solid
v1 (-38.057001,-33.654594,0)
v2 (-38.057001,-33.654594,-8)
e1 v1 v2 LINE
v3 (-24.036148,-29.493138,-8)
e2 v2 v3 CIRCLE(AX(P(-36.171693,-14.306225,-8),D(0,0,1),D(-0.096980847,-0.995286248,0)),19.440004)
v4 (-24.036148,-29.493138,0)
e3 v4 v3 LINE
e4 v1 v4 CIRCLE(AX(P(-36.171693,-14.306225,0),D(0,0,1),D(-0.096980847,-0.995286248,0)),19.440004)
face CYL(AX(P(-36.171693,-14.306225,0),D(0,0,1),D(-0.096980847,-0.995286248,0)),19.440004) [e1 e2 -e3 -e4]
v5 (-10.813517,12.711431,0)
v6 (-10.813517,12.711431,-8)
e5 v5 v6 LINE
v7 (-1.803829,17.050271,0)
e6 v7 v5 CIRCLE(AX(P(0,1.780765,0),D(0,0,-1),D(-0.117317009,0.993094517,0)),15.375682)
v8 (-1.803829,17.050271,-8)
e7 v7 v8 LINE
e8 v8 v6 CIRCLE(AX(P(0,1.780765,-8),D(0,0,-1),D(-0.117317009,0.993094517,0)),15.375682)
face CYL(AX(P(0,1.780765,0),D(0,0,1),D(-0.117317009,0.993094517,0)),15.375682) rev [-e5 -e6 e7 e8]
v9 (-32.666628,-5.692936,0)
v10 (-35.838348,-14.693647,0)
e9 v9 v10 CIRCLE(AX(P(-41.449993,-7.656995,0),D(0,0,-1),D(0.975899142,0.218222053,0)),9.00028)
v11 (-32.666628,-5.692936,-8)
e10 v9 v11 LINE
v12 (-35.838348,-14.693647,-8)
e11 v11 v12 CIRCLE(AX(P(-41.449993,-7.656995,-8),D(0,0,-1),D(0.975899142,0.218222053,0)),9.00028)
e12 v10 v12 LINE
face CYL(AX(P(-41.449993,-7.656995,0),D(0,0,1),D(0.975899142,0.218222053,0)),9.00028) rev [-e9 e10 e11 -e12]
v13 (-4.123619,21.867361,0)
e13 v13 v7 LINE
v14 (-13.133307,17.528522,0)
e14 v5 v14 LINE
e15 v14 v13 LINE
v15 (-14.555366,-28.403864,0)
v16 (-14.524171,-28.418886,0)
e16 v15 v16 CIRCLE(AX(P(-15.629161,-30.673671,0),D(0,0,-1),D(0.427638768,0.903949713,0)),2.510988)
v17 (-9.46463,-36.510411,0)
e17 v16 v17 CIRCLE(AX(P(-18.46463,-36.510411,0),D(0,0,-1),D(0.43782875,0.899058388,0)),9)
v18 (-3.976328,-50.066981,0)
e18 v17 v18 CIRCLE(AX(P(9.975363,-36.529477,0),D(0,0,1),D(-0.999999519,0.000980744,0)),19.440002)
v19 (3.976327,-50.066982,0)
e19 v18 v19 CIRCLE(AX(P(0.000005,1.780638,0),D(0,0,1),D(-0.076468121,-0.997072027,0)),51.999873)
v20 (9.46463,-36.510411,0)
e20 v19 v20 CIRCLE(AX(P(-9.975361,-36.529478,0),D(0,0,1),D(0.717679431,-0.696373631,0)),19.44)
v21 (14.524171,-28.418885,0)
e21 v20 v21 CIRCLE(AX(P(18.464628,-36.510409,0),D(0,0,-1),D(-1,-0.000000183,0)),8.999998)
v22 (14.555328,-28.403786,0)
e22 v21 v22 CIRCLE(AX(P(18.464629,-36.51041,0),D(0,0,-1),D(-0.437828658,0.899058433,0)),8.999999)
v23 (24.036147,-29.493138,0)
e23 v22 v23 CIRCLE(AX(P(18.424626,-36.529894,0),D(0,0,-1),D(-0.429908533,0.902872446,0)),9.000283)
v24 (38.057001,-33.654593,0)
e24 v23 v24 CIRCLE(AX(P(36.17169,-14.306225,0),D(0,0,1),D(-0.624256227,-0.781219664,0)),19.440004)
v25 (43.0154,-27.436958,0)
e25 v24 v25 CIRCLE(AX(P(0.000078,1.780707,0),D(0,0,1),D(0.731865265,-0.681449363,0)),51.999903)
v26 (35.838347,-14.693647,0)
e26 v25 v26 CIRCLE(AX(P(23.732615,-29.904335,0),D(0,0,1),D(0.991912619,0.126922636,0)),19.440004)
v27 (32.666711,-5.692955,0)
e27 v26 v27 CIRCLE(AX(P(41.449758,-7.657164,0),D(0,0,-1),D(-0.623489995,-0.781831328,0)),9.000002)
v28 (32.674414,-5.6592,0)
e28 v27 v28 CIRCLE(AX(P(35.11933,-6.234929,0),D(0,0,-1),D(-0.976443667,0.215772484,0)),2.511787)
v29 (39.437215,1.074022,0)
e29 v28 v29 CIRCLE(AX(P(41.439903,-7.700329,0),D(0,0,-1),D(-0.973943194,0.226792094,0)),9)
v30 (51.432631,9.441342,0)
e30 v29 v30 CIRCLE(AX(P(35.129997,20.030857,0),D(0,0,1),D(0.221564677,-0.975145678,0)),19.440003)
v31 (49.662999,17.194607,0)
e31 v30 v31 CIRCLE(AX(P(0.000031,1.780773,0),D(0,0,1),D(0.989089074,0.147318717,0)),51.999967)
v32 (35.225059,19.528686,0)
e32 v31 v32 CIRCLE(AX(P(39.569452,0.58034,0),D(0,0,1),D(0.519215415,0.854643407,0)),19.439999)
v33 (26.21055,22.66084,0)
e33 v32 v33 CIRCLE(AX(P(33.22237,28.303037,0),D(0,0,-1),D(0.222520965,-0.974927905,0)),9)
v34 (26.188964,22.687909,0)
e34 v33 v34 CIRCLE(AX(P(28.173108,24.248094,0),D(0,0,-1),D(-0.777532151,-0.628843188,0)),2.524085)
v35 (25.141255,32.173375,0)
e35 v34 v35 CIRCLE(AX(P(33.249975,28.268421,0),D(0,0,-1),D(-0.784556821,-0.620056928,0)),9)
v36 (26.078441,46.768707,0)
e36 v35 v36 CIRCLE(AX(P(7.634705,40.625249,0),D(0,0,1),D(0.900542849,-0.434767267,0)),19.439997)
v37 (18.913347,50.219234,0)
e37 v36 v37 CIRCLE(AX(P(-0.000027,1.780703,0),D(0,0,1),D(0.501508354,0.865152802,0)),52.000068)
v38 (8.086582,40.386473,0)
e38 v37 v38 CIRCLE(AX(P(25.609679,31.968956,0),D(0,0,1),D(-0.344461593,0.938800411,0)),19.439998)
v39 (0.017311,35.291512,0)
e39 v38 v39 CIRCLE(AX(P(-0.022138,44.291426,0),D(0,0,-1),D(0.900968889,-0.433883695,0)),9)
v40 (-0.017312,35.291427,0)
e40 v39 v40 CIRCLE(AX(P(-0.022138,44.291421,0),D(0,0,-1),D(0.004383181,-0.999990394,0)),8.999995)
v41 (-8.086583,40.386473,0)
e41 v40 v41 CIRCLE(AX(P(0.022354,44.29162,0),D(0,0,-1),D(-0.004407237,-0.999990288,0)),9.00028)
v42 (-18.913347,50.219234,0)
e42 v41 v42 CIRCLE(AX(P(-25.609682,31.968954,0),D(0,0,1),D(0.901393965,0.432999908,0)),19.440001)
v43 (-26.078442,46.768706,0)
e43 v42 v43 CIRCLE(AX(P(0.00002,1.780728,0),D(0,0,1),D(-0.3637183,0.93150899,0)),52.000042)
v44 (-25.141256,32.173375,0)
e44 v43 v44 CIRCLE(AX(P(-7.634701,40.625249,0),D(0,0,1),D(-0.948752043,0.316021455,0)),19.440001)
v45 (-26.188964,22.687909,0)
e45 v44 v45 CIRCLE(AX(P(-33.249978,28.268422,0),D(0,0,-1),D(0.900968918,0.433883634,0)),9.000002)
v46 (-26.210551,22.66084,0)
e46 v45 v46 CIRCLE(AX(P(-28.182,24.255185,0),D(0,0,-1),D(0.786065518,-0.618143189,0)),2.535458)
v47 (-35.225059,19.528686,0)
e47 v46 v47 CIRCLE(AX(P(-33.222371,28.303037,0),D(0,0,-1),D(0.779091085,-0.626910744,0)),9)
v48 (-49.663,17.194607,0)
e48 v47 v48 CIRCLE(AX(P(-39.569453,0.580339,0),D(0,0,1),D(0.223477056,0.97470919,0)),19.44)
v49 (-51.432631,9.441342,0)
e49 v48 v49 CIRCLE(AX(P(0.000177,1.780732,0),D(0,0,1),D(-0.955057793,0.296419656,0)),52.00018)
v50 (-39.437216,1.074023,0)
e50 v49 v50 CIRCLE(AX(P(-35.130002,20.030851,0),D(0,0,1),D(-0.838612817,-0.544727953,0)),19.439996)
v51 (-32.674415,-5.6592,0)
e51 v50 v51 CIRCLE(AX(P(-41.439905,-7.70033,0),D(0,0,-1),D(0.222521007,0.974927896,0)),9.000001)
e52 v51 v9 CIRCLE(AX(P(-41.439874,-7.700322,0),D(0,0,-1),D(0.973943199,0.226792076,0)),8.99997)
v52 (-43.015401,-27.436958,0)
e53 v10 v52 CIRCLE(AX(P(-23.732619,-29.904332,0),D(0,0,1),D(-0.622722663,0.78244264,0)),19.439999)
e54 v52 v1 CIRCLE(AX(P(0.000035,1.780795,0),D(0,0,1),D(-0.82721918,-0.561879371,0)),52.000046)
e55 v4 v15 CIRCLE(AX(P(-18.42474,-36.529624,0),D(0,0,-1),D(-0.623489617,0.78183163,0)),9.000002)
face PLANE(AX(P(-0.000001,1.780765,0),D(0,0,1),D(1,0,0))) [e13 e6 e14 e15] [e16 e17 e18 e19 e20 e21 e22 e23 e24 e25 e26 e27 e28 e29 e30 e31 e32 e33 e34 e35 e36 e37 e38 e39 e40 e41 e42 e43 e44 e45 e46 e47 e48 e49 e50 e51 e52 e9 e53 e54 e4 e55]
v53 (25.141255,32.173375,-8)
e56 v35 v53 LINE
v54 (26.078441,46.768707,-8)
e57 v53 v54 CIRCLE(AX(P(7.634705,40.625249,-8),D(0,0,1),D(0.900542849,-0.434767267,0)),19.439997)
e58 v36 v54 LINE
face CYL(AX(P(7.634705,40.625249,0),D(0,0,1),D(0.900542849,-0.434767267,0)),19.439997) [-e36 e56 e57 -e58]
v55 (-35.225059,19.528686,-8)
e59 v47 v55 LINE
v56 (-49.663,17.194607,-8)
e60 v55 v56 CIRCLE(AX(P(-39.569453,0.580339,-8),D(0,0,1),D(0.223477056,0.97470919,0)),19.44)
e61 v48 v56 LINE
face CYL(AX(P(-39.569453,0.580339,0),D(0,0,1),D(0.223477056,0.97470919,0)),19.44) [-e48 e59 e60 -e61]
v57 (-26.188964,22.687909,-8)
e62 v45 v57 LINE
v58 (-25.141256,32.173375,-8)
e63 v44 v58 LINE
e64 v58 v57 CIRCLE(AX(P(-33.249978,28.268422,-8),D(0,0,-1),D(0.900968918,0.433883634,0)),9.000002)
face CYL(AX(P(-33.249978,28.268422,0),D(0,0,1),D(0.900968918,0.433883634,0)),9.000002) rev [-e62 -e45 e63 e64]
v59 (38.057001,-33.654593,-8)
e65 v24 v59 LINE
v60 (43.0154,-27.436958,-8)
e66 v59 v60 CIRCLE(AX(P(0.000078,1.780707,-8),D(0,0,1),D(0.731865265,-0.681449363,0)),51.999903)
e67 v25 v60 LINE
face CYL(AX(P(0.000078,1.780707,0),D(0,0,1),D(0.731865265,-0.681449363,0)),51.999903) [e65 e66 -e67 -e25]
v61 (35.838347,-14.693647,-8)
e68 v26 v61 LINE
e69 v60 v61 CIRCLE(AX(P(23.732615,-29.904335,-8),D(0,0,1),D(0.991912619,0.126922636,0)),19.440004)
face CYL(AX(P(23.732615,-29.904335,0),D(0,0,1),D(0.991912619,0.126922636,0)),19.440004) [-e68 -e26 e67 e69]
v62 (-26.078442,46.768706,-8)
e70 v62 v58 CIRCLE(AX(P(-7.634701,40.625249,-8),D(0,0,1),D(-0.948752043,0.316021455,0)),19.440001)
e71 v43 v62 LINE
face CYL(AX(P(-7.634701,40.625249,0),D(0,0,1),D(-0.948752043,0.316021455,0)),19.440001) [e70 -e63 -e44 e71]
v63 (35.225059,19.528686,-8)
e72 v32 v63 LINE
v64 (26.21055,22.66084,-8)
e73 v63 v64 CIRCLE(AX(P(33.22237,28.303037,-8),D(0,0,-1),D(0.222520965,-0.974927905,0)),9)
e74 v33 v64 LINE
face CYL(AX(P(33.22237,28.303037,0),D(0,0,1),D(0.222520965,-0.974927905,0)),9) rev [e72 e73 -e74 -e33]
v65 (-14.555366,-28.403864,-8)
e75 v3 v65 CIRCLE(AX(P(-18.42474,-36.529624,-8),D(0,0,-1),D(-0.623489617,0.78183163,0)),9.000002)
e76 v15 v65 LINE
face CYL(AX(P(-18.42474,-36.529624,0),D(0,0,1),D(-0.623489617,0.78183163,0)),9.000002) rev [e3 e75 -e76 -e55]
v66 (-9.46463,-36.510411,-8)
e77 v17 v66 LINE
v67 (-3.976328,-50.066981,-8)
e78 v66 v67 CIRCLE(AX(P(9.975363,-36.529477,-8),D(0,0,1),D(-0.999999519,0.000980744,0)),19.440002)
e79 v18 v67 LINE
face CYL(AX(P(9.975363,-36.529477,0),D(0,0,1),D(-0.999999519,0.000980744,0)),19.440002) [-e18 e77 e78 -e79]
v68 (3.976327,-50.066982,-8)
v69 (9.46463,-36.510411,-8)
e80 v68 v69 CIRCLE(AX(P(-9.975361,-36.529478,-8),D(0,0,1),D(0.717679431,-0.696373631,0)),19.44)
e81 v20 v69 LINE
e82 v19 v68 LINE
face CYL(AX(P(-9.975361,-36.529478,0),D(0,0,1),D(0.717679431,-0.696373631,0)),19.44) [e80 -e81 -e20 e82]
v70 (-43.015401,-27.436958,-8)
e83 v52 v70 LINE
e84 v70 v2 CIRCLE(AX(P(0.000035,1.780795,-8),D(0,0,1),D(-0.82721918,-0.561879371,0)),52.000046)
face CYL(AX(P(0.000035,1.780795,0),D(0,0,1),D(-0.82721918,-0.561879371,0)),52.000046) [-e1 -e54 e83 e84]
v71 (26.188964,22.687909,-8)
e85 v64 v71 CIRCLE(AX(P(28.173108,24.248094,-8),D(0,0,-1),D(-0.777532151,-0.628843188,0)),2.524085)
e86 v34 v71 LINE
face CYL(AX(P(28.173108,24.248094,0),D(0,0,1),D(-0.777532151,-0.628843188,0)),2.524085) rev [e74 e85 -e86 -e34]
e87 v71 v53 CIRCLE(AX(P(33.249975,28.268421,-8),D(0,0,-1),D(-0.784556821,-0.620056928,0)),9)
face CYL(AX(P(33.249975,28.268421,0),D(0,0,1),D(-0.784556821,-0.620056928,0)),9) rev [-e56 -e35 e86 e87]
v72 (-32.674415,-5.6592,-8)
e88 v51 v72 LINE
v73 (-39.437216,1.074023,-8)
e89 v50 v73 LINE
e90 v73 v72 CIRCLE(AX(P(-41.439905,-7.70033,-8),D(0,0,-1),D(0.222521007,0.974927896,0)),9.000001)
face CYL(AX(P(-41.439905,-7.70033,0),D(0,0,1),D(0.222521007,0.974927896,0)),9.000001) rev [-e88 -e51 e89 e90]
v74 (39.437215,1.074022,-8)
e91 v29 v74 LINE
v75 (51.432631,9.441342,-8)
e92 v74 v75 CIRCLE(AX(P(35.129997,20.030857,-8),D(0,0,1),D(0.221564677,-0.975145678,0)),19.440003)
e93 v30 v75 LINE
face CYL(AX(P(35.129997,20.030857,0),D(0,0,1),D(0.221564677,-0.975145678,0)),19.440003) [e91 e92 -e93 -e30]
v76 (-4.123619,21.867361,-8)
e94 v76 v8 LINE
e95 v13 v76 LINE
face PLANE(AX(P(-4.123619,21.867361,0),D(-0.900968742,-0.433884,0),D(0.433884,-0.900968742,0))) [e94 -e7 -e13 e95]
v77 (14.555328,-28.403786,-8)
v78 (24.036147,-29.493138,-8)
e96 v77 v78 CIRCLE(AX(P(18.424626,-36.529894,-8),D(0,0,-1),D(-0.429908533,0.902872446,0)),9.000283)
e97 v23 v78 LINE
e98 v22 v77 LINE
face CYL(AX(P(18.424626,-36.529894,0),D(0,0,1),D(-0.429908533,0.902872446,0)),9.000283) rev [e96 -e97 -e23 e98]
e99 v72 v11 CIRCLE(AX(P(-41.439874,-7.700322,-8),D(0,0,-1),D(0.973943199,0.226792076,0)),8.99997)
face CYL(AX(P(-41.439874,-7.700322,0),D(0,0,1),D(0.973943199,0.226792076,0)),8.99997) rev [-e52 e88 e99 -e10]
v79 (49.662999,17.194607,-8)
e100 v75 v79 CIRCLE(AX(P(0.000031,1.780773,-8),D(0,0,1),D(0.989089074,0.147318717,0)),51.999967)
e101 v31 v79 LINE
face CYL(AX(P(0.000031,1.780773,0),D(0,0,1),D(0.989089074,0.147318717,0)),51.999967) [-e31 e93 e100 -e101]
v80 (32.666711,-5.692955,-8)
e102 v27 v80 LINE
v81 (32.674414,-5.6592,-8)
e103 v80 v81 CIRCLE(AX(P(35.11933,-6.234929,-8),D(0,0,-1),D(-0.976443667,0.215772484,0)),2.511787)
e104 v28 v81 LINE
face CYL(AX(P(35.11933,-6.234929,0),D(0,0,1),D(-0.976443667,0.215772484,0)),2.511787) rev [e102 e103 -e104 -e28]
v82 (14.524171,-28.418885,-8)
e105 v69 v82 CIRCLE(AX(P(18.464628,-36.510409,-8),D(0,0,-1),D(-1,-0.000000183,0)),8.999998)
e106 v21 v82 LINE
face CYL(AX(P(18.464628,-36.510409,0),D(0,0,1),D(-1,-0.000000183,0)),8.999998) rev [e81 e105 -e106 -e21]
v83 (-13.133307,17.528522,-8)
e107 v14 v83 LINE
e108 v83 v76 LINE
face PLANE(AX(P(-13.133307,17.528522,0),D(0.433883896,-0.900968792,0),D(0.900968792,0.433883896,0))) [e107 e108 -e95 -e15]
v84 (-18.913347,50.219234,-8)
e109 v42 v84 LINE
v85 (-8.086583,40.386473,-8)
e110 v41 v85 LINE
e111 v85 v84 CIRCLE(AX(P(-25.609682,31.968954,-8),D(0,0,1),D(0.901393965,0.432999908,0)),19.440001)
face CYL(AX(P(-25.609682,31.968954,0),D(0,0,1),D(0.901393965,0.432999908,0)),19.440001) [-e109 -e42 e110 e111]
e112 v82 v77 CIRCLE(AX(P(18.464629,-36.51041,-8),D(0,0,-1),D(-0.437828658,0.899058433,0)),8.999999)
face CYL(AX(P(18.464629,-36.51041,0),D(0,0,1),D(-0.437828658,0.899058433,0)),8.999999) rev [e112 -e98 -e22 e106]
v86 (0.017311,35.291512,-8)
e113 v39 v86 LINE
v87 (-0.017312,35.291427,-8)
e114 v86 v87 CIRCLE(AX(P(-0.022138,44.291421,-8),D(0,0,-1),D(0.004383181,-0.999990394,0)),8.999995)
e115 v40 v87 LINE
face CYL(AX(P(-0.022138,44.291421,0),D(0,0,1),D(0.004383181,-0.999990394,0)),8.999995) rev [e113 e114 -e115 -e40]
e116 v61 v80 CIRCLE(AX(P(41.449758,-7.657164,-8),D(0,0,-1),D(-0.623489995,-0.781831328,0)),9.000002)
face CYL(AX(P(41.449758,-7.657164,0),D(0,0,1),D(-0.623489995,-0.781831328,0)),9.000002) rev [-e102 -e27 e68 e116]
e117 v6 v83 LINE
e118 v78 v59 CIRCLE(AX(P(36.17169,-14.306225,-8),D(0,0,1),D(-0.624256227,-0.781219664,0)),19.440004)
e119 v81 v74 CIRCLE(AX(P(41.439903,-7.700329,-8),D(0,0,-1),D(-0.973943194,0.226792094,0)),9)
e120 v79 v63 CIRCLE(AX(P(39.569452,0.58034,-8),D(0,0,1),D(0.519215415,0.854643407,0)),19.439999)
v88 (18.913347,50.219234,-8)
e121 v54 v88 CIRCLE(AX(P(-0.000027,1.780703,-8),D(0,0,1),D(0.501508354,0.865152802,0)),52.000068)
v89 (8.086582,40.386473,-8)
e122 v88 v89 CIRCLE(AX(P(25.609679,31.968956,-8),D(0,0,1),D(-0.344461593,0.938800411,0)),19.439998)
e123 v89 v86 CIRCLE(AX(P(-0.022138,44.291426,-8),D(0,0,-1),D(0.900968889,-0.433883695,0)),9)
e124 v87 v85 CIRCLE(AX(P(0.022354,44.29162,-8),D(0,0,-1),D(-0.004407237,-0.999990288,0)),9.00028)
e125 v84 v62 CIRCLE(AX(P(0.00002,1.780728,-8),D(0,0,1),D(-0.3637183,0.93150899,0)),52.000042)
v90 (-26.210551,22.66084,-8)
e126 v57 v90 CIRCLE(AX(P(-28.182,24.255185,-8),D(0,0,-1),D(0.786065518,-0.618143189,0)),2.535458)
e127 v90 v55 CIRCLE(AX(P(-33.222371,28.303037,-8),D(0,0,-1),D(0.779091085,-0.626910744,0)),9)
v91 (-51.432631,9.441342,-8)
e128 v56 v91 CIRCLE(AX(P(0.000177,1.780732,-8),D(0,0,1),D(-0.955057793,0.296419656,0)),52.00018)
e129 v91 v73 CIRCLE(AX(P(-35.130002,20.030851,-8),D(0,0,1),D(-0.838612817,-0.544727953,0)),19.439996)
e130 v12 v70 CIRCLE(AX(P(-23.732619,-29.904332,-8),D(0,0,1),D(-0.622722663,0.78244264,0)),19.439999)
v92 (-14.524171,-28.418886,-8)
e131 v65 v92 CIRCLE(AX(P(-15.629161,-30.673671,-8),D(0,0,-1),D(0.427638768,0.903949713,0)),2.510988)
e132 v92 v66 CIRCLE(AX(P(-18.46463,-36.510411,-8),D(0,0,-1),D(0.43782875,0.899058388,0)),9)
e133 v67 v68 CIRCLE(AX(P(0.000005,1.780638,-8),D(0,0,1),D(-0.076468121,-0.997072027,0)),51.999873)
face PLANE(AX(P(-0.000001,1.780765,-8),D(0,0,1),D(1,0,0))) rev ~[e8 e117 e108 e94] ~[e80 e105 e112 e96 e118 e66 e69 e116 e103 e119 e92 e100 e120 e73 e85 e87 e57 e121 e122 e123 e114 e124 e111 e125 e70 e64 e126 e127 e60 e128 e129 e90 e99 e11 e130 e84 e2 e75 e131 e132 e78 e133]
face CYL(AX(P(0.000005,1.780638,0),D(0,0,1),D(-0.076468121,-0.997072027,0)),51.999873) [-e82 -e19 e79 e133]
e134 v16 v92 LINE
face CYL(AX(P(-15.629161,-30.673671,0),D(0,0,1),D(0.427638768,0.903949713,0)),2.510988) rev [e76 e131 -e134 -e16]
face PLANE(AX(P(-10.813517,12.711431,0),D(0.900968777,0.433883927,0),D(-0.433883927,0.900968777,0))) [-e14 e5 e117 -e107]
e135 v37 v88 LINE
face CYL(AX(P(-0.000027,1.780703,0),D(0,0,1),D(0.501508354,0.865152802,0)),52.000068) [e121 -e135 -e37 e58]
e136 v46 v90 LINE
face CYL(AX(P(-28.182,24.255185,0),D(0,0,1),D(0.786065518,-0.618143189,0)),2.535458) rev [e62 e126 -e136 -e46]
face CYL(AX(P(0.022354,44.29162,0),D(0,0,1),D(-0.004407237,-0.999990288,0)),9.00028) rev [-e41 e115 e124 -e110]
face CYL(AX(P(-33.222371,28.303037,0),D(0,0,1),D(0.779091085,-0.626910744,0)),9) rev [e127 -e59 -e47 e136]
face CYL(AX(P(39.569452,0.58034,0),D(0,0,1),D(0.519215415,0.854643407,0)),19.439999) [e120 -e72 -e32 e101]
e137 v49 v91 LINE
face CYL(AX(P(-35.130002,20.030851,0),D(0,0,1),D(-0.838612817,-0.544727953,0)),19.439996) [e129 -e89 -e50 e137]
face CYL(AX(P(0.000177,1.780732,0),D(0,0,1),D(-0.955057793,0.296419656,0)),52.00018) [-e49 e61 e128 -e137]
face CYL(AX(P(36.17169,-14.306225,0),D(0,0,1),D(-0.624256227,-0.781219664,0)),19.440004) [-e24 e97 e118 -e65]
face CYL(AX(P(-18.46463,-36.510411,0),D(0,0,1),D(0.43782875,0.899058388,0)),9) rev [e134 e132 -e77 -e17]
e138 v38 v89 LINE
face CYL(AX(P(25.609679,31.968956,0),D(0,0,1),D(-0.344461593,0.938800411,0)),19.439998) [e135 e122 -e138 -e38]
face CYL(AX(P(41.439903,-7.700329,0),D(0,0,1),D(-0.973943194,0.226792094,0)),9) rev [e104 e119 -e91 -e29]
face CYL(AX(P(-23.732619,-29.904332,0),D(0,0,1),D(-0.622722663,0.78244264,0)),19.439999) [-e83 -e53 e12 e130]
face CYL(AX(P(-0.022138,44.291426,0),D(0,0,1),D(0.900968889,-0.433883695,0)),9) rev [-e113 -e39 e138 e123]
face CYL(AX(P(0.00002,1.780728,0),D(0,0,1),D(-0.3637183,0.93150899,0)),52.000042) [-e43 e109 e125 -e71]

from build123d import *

# Parameters (mm, degrees)
F1_DEPTH = 8


# Not quite as in the source:
# - ends of sketch curves that miss each other by under 0.0002 mm in the source are joined


with BuildPart() as f1:
    # F0 (on Top) → F1 (new body)
    with BuildSketch(Plane.XY):
        with BuildLine():
            ThreePointArc((0.0173106263, 35.2915124556), (-6.457e-07, 35.2914532257), (-0.0173119996, 35.2914272939))
            ThreePointArc((-0.0173119996, 35.2914272939), (-4.7828415657, 36.6814206792), (-8.0865831016, 40.3864729511))
            ThreePointArc((-8.0865831016, 40.3864729511), (-12.5400209066, 46.3598395768), (-18.9133471994, 50.2192344565))
            ThreePointArc((-18.9133471994, 50.2192344565), (-22.5619545404, 48.6311460797), (-26.0784416984, 46.7687064797))
            ThreePointArc((-26.0784416984, 46.7687064797), (-27.0347490245, 39.379546207), (-25.1412558363, 32.173375079))
            ThreePointArc((-25.1412558363, 32.173375079), (-24.3043791298, 27.2803437578), (-26.1889642235, 22.6879091335))
            ThreePointArc((-26.1889642235, 22.6879091335), (-26.1997114341, 22.6743379832), (-26.2105512359, 22.6608403006))
            ThreePointArc((-26.2105512359, 22.6608403006), (-30.268483933, 19.8015929347), (-35.2250588486, 19.5286856632))
            ThreePointArc((-35.2250588486, 19.5286856632), (-42.6718988891, 19.7711813344), (-49.6630001039, 17.1946071711))
            ThreePointArc((-49.6630001039, 17.1946071711), (-50.6962513252, 13.3518540399), (-51.4326312922, 9.4413418946))
            ThreePointArc((-51.4326312922, 9.4413418946), (-46.2518013791, 4.086604184), (-39.4372158458, 1.0740226787))
            ThreePointArc((-39.4372158458, 1.0740226787), (-35.0899055663, -1.3224359394), (-32.6744151986, -5.6592003729))
            ThreePointArc((-32.6744151986, -5.6592003729), (-32.6705053342, -5.676064432), (-32.6666279149, -5.6929359805))
            ThreePointArc((-32.6666279149, -5.6929359805), (-32.9613409881, -10.648285961), (-35.8383477489, -14.6936473148))
            ThreePointArc((-35.8383477489, -14.6936473148), (-40.6709671644, -20.3646275254), (-43.0154005889, -27.4369580526))
            ThreePointArc((-43.0154005889, -27.4369580526), (-40.655237183, -30.6407045779), (-38.0570010523, -33.6545940487))
            ThreePointArc((-38.0570010523, -33.6545940487), (-30.6403035701, -32.942681267), (-24.0361481426, -29.4931378216))
            ThreePointArc((-24.0361481426, -29.4931378216), (-19.4520178261, -27.5884419734), (-14.5553656824, -28.4038640421))
            ThreePointArc((-14.5553656824, -28.4038640421), (-14.539742708, -28.4113209434), (-14.5241712519, -28.4188855039))
            ThreePointArc((-14.5241712519, -28.4188855039), (-10.8336363316, -31.7388351981), (-9.46463, -36.510411))
            ThreePointArc((-9.46463, -36.510411), (-8.0439677673, -43.8245030704), (-3.9763277521, -50.0669807595))
            ThreePointArc((-3.9763277521, -50.0669807595), (-4.985e-07, -50.219235), (3.9763270429, -50.066981559))
            ThreePointArc((3.9763270429, -50.066981559), (8.0439676368, -43.8245033926), (9.4646296494, -36.5104109994))
            ThreePointArc((9.4646296494, -36.5104109994), (10.8336355705, -31.738834816), (14.5241710621, -28.4188851093))
            ThreePointArc((14.5241710621, -28.4188851093), (14.5397421135, -28.4113207469), (14.555327686, -28.4037863488))
            ThreePointArc((14.555327686, -28.4037863488), (19.4520168261, -27.5884419734), (24.0361467636, -29.4931382964))
            ThreePointArc((24.0361467636, -29.4931382964), (30.6403030472, -32.9426814086), (38.0570009358, -33.6545933411))
            ThreePointArc((38.0570009358, -33.6545933411), (40.655237183, -30.6407045779), (43.0154002031, -27.436958138))
            ThreePointArc((43.0154002031, -27.436958138), (40.6709661644, -20.3646275254), (35.8383467951, -14.6936472574))
            ThreePointArc((35.8383467951, -14.6936472574), (32.9613408944, -10.6482856952), (32.6667108543, -5.6929547524))
            ThreePointArc((32.6667108543, -5.6929547524), (32.6705043598, -5.6760643215), (32.67441425, -5.659200152))
            ThreePointArc((32.67441425, -5.659200152), (35.0899046467, -1.3224358594), (39.4372149344, 1.0740222872))
            ThreePointArc((39.4372149344, 1.0740222872), (46.2518003791, 4.086604184), (51.4326310926, 9.4413419398))
            ThreePointArc((51.4326310926, 9.4413419398), (50.6962513088, 13.3518541117), (49.6629990471, 17.1946070146))
            ThreePointArc((49.6629990471, 17.1946070146), (42.6718983702, 19.7711812567), (35.2250588084, 19.5286858355))
            ThreePointArc((35.2250588084, 19.5286858355), (30.2684833934, 19.8015927747), (26.2105502359, 22.6608403006))
            ThreePointArc((26.2105502359, 22.6608403006), (26.1997106027, 22.6743373459), (26.1889636103, 22.687908644))
            ThreePointArc((26.1889636103, 22.687908644), (24.3043781641, 27.2803434477), (25.1412552893, 32.1733748607))
            ThreePointArc((25.1412552893, 32.1733748607), (27.0347490207, 39.3795461477), (26.0784413783, 46.768707126))
            ThreePointArc((26.0784413783, 46.768707126), (22.5619541507, 48.6311462674), (18.9133467528, 50.2192343669))
            ThreePointArc((18.9133467528, 50.2192343669), (12.5400199066, 46.3598395768), (8.0865821819, 40.3864729126))
            ThreePointArc((8.0865821819, 40.3864729126), (4.7828405657, 36.6814206792), (0.0173106263, 35.2915124556))
        make_face()
        with BuildLine():
            Line((-10.813517, 12.711431), (-13.133307, 17.528522))
            Line((-13.133307, 17.528522), (-4.123619, 21.867361))
            Line((-4.123619, 21.867361), (-1.803829, 17.050271))
            ThreePointArc((-1.803829, 17.050271), (6.6712619157, -12.0722441106), (-10.813517, 12.711431))
        make_face(mode=Mode.SUBTRACT)
    extrude(amount=-F1_DEPTH)


solid = f1.part
